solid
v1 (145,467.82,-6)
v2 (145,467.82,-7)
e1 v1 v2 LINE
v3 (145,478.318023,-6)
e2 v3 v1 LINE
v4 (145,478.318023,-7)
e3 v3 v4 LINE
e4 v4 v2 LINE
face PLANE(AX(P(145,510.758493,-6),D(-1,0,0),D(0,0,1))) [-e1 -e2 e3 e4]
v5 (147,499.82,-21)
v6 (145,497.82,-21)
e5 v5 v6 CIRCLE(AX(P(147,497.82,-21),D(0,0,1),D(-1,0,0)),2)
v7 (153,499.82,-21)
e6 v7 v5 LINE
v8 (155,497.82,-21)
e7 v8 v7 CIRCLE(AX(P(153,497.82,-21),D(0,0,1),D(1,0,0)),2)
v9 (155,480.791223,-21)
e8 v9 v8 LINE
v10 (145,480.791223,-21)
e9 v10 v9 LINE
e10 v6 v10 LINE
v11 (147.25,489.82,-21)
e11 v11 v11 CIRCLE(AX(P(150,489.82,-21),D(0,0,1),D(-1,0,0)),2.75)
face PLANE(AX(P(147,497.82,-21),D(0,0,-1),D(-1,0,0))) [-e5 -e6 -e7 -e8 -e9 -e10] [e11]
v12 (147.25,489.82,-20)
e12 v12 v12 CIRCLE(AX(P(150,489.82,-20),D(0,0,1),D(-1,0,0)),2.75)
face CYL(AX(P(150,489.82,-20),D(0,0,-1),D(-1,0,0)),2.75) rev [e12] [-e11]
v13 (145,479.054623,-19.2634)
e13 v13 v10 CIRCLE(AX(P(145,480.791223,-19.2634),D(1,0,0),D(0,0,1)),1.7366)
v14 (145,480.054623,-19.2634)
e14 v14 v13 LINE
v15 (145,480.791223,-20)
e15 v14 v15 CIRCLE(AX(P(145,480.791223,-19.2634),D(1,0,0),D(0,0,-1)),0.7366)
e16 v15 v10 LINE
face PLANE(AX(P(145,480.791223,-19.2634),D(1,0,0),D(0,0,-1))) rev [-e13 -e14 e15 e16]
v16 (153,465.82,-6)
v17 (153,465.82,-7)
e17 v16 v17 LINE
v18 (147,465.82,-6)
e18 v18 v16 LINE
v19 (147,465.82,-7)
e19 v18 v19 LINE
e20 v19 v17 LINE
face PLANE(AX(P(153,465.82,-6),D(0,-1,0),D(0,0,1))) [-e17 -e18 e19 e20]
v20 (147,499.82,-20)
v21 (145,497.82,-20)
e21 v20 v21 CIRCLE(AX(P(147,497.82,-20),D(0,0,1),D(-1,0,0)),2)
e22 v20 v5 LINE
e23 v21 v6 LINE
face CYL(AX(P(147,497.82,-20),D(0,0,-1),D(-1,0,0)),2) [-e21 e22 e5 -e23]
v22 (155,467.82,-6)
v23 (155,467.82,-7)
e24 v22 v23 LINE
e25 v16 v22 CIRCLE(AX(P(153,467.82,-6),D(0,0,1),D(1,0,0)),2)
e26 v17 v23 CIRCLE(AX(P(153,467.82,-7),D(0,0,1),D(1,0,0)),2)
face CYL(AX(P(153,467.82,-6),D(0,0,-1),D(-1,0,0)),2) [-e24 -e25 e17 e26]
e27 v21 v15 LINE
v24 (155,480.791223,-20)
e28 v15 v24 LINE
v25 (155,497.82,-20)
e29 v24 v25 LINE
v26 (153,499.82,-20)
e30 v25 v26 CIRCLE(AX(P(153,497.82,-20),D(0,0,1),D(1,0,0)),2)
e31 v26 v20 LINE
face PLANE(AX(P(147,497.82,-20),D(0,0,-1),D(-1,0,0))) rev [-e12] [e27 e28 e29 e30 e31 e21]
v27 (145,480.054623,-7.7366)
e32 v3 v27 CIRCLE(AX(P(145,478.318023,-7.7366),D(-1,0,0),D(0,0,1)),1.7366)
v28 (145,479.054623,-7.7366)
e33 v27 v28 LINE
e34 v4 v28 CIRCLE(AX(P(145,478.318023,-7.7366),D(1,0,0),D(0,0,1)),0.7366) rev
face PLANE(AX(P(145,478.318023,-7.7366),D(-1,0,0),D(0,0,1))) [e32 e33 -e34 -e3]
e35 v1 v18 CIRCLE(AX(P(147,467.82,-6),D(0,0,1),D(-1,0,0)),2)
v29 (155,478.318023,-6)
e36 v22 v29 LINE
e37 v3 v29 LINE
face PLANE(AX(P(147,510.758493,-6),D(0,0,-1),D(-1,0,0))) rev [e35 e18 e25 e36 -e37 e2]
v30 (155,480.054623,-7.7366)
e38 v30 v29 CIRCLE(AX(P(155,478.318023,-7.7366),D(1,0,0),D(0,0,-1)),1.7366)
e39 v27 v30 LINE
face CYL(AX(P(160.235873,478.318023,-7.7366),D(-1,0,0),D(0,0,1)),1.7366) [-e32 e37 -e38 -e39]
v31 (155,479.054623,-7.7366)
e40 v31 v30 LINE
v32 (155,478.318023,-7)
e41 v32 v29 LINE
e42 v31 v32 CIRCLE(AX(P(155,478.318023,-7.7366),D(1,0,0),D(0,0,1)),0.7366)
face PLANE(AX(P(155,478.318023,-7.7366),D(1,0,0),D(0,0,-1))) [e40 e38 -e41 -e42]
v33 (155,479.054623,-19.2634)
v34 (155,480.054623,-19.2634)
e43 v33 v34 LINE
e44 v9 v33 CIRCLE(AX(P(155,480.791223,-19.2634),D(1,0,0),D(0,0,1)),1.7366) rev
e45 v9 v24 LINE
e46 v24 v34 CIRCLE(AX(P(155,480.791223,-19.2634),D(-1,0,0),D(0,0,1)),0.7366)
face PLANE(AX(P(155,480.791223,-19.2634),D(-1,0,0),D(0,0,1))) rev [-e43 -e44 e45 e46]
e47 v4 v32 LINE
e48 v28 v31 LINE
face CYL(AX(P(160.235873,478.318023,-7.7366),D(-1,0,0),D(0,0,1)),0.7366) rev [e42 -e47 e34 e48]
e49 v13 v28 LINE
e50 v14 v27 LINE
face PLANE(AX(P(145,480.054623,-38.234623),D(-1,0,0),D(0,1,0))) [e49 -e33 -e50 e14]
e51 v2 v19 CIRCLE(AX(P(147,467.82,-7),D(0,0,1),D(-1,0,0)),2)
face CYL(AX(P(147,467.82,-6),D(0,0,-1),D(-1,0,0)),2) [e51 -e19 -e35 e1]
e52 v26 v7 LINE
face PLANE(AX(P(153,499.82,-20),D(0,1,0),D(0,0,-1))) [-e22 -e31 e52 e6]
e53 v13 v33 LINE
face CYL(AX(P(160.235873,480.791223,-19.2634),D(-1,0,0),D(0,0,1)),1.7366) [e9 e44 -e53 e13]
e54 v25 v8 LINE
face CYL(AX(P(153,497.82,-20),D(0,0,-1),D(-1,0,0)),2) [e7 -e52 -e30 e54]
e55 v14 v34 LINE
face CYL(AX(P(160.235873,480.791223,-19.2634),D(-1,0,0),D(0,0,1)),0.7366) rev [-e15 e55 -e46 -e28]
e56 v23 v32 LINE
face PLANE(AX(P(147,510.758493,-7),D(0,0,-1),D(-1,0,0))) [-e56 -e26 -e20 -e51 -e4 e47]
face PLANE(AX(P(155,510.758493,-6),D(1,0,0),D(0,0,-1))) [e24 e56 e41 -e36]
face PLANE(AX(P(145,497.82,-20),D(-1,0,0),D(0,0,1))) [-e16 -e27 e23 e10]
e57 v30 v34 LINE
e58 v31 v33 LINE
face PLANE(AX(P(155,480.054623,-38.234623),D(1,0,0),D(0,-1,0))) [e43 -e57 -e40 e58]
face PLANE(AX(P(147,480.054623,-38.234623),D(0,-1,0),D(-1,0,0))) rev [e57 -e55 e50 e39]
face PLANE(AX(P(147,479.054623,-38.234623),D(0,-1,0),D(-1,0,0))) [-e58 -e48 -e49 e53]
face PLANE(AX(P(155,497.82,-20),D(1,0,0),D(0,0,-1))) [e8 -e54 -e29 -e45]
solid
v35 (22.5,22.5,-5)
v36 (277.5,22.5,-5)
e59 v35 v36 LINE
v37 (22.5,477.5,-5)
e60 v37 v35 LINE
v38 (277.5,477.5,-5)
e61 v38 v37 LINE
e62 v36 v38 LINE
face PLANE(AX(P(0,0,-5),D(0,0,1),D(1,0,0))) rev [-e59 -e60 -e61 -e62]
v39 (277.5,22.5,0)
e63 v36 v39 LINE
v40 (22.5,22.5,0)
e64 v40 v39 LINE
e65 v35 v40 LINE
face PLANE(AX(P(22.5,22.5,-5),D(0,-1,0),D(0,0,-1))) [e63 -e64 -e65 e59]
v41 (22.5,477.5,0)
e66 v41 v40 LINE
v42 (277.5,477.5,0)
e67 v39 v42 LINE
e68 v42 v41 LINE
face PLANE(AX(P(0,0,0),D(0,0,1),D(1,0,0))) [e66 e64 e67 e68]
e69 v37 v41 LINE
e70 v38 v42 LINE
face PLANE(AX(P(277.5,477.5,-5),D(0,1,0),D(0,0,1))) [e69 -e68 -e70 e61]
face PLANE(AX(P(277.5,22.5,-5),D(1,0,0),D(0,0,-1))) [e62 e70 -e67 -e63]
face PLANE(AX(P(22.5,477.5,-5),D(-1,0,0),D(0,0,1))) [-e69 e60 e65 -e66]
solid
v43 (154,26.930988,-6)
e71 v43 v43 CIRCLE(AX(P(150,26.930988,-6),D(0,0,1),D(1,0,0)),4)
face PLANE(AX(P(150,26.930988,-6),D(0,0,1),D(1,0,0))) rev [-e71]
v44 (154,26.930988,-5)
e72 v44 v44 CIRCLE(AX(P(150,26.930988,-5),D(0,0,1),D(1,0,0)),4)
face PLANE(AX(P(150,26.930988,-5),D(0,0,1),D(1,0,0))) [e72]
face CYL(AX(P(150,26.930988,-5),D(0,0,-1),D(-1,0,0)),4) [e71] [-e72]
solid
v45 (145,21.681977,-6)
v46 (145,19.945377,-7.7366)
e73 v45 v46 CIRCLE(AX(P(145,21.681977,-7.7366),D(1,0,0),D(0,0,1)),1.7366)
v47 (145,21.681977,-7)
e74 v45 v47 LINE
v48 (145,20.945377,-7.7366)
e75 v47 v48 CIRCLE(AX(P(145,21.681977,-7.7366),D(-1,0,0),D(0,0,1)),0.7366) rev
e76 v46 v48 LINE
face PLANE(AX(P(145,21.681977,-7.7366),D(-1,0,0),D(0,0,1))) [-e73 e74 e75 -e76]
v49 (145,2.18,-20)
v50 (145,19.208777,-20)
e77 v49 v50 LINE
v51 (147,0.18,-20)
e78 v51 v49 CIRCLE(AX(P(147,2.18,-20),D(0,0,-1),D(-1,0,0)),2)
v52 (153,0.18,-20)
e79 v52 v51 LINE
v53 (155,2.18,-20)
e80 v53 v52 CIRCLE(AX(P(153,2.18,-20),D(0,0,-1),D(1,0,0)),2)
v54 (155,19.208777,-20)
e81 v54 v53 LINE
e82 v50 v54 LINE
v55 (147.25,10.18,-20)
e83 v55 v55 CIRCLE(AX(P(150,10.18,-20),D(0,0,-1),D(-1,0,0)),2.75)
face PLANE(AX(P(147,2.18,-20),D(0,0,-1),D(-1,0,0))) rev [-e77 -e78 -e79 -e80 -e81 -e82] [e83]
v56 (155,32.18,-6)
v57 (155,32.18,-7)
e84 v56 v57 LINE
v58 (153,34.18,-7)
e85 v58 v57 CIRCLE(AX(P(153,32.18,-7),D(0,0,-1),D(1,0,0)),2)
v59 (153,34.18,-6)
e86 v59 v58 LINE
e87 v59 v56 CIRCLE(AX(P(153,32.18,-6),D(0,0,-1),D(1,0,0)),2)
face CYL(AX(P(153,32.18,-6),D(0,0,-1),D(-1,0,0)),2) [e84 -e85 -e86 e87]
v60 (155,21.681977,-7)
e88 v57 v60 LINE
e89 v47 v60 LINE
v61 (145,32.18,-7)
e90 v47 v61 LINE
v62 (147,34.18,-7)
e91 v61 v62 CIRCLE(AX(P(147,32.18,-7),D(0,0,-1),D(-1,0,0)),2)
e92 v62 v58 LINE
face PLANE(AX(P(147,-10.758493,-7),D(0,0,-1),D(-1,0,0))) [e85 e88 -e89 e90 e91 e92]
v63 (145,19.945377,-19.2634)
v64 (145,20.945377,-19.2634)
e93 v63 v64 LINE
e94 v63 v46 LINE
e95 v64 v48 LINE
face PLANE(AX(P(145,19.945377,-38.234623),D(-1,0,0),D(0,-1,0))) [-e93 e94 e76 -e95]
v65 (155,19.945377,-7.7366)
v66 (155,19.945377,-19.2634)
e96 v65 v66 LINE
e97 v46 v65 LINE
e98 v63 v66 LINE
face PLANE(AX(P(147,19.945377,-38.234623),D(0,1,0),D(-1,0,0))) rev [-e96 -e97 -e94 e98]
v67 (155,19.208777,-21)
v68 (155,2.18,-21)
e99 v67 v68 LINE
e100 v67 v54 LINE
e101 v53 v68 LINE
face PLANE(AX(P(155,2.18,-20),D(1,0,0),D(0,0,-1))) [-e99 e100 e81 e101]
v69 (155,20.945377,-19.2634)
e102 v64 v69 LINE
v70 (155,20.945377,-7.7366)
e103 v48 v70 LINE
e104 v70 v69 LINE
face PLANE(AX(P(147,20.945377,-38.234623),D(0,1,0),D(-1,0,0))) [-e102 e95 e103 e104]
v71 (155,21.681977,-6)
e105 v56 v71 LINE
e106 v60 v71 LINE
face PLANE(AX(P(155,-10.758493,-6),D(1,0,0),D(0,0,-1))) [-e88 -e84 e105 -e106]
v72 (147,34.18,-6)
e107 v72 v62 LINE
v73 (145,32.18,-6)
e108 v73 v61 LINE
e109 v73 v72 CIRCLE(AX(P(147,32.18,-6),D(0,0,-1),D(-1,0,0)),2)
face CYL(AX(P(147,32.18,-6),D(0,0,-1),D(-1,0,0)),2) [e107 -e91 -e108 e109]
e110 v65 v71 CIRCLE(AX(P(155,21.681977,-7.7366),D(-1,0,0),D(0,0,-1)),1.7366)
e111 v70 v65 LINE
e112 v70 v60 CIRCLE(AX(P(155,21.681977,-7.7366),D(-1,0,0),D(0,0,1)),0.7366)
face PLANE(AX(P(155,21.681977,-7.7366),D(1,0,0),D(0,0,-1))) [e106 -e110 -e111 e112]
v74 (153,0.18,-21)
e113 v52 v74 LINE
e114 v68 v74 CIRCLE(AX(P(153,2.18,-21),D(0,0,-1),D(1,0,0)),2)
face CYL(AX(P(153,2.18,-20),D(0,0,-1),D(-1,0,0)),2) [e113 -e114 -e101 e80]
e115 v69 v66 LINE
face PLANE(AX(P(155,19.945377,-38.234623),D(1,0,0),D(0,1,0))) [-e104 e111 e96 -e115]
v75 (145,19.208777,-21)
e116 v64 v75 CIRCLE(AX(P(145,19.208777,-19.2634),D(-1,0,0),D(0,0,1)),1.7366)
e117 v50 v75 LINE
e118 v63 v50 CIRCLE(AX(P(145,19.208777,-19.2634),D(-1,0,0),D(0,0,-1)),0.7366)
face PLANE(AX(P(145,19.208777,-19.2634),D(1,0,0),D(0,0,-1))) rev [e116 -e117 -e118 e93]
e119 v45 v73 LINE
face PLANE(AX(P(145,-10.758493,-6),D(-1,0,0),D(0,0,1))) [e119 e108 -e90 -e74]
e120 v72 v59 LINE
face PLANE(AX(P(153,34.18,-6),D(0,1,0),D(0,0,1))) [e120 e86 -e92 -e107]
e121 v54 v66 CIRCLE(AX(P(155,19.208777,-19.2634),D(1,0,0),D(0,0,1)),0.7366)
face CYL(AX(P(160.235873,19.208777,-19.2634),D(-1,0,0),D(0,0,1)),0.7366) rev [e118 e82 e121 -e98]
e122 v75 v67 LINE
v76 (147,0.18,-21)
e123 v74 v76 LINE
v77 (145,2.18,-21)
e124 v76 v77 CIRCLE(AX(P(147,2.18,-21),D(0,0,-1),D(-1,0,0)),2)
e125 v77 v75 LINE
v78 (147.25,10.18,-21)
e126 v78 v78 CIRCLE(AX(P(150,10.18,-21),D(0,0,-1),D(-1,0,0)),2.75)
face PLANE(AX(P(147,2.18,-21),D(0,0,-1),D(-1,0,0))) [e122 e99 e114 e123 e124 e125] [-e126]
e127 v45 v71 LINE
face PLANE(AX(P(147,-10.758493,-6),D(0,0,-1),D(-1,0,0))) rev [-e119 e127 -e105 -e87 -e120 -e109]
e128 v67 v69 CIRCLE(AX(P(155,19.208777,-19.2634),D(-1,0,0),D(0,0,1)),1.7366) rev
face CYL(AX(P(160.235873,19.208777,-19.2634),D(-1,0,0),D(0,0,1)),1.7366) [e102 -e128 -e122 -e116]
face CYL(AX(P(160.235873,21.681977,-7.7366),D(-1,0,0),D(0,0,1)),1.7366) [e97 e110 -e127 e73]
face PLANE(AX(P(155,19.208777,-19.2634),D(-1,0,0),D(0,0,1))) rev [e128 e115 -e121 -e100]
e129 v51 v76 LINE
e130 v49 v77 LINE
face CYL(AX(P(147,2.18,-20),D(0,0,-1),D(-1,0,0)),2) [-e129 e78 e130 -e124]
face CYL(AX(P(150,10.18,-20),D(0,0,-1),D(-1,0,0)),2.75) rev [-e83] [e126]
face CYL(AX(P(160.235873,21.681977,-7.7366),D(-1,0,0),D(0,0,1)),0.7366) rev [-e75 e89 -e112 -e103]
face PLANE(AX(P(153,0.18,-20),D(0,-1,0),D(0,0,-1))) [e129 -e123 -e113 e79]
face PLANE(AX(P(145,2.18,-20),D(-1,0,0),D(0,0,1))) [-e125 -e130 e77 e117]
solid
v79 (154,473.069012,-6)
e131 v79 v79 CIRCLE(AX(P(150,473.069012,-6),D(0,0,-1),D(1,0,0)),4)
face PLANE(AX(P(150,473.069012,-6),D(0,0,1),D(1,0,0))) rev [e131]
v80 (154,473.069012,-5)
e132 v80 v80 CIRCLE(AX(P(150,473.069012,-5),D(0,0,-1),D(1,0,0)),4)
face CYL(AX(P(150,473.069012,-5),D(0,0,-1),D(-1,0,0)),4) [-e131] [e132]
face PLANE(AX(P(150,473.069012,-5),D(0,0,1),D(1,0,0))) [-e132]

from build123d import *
from build123d.topology import SkipClean

# Parameters (mm, degrees)
SKETCH1_W           = 255
SKETCH1_H           = 455
BOSS_EXTRUDE1_DEPTH = 5
SKETCH2_R           = 2.75
BASE_FLANGE1_DEPTH  = 1
JOG1_START          = 145
JOG1_DEPTH          = 10
JOG1_START_2        = 147
JOG1_2_DEPTH        = 6
JOG1_START_3        = -7.7366
JOG1_3_DEPTH        = 1.716372919
JOG1_START_4        = -20
JOG1_4_OUTLINE_W    = 2
JOG1_4_OUTLINE_H    = 1
JOG1_4_DEPTH        = 12.381759831
JOG1_START_5        = -7
JOG1_5_DEPTH        = 1
JOG1_6_DEPTH        = 10
JOG1_7_DEPTH        = 10
SKETCH8_R           = 4
BOSS_EXTRUDE2_DEPTH = 1


with BuildPart() as part:
    # Sketch1 → Boss-Extrude1 (new body)
    with BuildSketch(Plane.XY):
        with Locations((150, 250)):
            Rectangle(SKETCH1_W, SKETCH1_H)
    extrude(amount=-BOSS_EXTRUDE1_DEPTH)


with BuildPart() as body_2:
    # Base-Flange1: sheet metal written as solids
    # Sketch2 → Base-Flange1 (new body)
    with BuildSketch(Plane(origin=(0, 0, -21), x_dir=(-1, 0, 0), z_dir=(0, 0, -1))):
        with BuildLine():
            Line((-153, 0.18), (-147, 0.18))
            ThreePointArc((-147, 0.18), (-145.585786438, 0.765786438), (-145, 2.18))
            Line((-145, 2.18), (-145, 32.18))
            ThreePointArc((-145, 32.18), (-145.585786438, 33.594213562), (-147, 34.18))
            Line((-147, 34.18), (-153, 34.18))
            ThreePointArc((-153, 34.18), (-154.414213562, 33.594213562), (-155, 32.18))
            Line((-155, 32.18), (-155, 2.18))
            ThreePointArc((-155, 2.18), (-154.414213562, 0.765786438), (-153, 0.18))
        make_face()
        with Locations((-150, 10.18)):
            Circle(SKETCH2_R, mode=Mode.SUBTRACT)
    extrude(amount=-BASE_FLANGE1_DEPTH)

    # Jog1: read off the stored shape, not the designer's step
    # Jog1 outline → Jog1 (cut)
    with BuildSketch(Plane.YZ.offset(JOG1_START)):
        with BuildLine():
            Line((34.18, -20), (20.781417721, -20))
            ThreePointArc((20.781417721, -20), (20.140602795, -20.728828115), (19.208776631, -21))
            Line((19.208776631, -21), (34.18, -21))
            Line((34.18, -21), (34.18, -20))
        make_face()
    extrude(amount=JOG1_DEPTH, mode=Mode.SUBTRACT)

    # Jog1 2 outline → Jog1 2 (add)
    with BuildSketch(Plane.YZ.offset(JOG1_START_2)):
        with BuildLine():
            ThreePointArc((20.781417721, -20), (20.903891388, -19.640713558), (20.945376631, -19.2634))
            Line((20.945376631, -19.2634), (20.945376631, -7.7366))
            ThreePointArc((20.945376631, -7.7366), (21.161121776, -7.215745145), (21.681976631, -7))
            Line((21.681976631, -7), (34.18, -7))
            Line((34.18, -7), (34.18, -6))
            Line((34.18, -6), (21.681976631, -6))
            ThreePointArc((21.681976631, -6), (20.454014995, -6.508638364), (19.945376631, -7.7366))
            Line((19.945376631, -7.7366), (19.945376631, -19.2634))
            ThreePointArc((19.945376631, -19.2634), (19.729631486, -19.784254855), (19.208776631, -20))
            Line((19.208776631, -20), (20.781417721, -20))
        make_face()
    extrude(amount=JOG1_2_DEPTH)

    # Jog1 3 outline → Jog1 3 (add)
    with BuildSketch(Plane.XY.offset(JOG1_START_3)):
        with BuildLine():
            Line((155, 19.945376631), (155, 32.18))
            ThreePointArc((155, 32.18), (154.414213562, 33.594213562), (153, 34.18))
            Line((153, 34.18), (153, 19.945376631))
            Line((153, 19.945376631), (155, 19.945376631))
        make_face()
        with BuildLine():
            Line((147, 19.945376631), (147, 34.18))
            ThreePointArc((147, 34.18), (145.585786438, 33.594213562), (145, 32.18))
            Line((145, 32.18), (145, 19.945376631))
            Line((145, 19.945376631), (147, 19.945376631))
        make_face()
    extrude(amount=JOG1_3_DEPTH)

    # Jog1 4 outline → Jog1 4 (add)
    with BuildSketch(Plane.XY.offset(JOG1_START_4)):
        with Locations((154, 20.445376631)):
            Rectangle(JOG1_4_OUTLINE_W, JOG1_4_OUTLINE_H)
        with Locations((146, 20.445376631)):
            Rectangle(JOG1_4_OUTLINE_W, JOG1_4_OUTLINE_H)
    extrude(amount=JOG1_4_DEPTH)

    # Jog1 5 outline → Jog1 5 (add)
    with BuildSketch(Plane.XY.offset(JOG1_START_5)):
        with BuildLine():
            Line((153, 20.945376631), (155, 20.945376631))
            Line((155, 20.945376631), (155, 32.18))
            ThreePointArc((155, 32.18), (154.414213562, 33.594213562), (153, 34.18))
            Line((153, 34.18), (153, 20.945376631))
        make_face()
        with BuildLine():
            Line((145, 20.945376631), (147, 20.945376631))
            Line((147, 20.945376631), (147, 34.18))
            ThreePointArc((147, 34.18), (145.585786438, 33.594213562), (145, 32.18))
            Line((145, 32.18), (145, 20.945376631))
        make_face()
    extrude(amount=JOG1_5_DEPTH)

    # Jog1 6 outline → Jog1 6 (cut)
    with SkipClean():  # the faces are left unmerged after this step: merging them gives an invalid solid
        with BuildSketch(Plane.YZ.offset(JOG1_START)):
            with BuildLine():
                Line((19.945376631, -6.020227081), (19.945376631, -7.7366))
                ThreePointArc((19.945376631, -7.7366), (20.454014995, -6.508638364), (21.681976631, -6))
                Line((21.681976631, -6), (36, -5.999999994))
                Line((36, -5.999999994), (36, -5))
                Line((36, -5), (20.945376637, -5))
                Line((20.945376637, -5), (20.945376637, -6))
                Line((20.945376637, -6), (20.945376631, -6.020227081))
                Line((20.945376631, -6.020227081), (19.945376631, -6.020227081))
            make_face()
            with BuildLine():
                ThreePointArc((20.781417721, -20), (20.436738266, -20.491361637), (19.945376629, -20.836041092))
                Line((19.945376629, -20.836041092), (19.945376626, -21))
                Line((19.945376626, -21), (36, -21))
                Line((36, -21), (36, -7))
                Line((36, -7), (21.681976631, -7))
                ThreePointArc((21.681976631, -7), (21.161121776, -7.215745145), (20.945376631, -7.7366))
                Line((20.945376631, -7.7366), (20.945376631, -19.2634))
                ThreePointArc((20.945376631, -19.2634), (20.903891388, -19.640713558), (20.781417721, -20))
            make_face()
        extrude(amount=JOG1_6_DEPTH, mode=Mode.SUBTRACT)
    add(body_2.part.scale(1), mode=Mode.REPLACE)  # the faces are merged on a copy

    # Jog1 7 outline → Jog1 7 (add)
    with BuildSketch(Plane.YZ.offset(JOG1_START)):
        with BuildLine():
            Line((19.945376631, -20), (19.945376631, -19.2634))
            ThreePointArc((19.945376631, -19.2634), (19.729631486, -19.784254855), (19.208776631, -20))
            Line((19.208776631, -20), (18, -20))
            Line((18, -20), (18, -21))
            Line((18, -21), (19.208776631, -21))
            ThreePointArc((19.208776631, -21), (19.586090188, -20.958514757), (19.945376629, -20.836041092))
            Line((19.945376629, -20.836041092), (19.945376631, -20))
        make_face()
    extrude(amount=JOG1_7_DEPTH)


with BuildPart() as body_3:
    # Sketch8 → Boss-Extrude2 (new body)
    with BuildSketch(Plane.XY.offset(-6)):
        with Locations((150, 26.930988316)):
            Circle(SKETCH8_R)
    extrude(amount=BOSS_EXTRUDE2_DEPTH)


with BuildPart() as body_4:
    # Mirror1: mirrored copy
    add(body_2.part.mirror(Plane.ZX.offset(250)))


with BuildPart() as body_5:
    # Mirror1 2: mirrored copy
    add(body_3.part.mirror(Plane.ZX.offset(250)))


solid = Compound([part.part, body_2.part, body_3.part, body_4.part, body_5.part])
